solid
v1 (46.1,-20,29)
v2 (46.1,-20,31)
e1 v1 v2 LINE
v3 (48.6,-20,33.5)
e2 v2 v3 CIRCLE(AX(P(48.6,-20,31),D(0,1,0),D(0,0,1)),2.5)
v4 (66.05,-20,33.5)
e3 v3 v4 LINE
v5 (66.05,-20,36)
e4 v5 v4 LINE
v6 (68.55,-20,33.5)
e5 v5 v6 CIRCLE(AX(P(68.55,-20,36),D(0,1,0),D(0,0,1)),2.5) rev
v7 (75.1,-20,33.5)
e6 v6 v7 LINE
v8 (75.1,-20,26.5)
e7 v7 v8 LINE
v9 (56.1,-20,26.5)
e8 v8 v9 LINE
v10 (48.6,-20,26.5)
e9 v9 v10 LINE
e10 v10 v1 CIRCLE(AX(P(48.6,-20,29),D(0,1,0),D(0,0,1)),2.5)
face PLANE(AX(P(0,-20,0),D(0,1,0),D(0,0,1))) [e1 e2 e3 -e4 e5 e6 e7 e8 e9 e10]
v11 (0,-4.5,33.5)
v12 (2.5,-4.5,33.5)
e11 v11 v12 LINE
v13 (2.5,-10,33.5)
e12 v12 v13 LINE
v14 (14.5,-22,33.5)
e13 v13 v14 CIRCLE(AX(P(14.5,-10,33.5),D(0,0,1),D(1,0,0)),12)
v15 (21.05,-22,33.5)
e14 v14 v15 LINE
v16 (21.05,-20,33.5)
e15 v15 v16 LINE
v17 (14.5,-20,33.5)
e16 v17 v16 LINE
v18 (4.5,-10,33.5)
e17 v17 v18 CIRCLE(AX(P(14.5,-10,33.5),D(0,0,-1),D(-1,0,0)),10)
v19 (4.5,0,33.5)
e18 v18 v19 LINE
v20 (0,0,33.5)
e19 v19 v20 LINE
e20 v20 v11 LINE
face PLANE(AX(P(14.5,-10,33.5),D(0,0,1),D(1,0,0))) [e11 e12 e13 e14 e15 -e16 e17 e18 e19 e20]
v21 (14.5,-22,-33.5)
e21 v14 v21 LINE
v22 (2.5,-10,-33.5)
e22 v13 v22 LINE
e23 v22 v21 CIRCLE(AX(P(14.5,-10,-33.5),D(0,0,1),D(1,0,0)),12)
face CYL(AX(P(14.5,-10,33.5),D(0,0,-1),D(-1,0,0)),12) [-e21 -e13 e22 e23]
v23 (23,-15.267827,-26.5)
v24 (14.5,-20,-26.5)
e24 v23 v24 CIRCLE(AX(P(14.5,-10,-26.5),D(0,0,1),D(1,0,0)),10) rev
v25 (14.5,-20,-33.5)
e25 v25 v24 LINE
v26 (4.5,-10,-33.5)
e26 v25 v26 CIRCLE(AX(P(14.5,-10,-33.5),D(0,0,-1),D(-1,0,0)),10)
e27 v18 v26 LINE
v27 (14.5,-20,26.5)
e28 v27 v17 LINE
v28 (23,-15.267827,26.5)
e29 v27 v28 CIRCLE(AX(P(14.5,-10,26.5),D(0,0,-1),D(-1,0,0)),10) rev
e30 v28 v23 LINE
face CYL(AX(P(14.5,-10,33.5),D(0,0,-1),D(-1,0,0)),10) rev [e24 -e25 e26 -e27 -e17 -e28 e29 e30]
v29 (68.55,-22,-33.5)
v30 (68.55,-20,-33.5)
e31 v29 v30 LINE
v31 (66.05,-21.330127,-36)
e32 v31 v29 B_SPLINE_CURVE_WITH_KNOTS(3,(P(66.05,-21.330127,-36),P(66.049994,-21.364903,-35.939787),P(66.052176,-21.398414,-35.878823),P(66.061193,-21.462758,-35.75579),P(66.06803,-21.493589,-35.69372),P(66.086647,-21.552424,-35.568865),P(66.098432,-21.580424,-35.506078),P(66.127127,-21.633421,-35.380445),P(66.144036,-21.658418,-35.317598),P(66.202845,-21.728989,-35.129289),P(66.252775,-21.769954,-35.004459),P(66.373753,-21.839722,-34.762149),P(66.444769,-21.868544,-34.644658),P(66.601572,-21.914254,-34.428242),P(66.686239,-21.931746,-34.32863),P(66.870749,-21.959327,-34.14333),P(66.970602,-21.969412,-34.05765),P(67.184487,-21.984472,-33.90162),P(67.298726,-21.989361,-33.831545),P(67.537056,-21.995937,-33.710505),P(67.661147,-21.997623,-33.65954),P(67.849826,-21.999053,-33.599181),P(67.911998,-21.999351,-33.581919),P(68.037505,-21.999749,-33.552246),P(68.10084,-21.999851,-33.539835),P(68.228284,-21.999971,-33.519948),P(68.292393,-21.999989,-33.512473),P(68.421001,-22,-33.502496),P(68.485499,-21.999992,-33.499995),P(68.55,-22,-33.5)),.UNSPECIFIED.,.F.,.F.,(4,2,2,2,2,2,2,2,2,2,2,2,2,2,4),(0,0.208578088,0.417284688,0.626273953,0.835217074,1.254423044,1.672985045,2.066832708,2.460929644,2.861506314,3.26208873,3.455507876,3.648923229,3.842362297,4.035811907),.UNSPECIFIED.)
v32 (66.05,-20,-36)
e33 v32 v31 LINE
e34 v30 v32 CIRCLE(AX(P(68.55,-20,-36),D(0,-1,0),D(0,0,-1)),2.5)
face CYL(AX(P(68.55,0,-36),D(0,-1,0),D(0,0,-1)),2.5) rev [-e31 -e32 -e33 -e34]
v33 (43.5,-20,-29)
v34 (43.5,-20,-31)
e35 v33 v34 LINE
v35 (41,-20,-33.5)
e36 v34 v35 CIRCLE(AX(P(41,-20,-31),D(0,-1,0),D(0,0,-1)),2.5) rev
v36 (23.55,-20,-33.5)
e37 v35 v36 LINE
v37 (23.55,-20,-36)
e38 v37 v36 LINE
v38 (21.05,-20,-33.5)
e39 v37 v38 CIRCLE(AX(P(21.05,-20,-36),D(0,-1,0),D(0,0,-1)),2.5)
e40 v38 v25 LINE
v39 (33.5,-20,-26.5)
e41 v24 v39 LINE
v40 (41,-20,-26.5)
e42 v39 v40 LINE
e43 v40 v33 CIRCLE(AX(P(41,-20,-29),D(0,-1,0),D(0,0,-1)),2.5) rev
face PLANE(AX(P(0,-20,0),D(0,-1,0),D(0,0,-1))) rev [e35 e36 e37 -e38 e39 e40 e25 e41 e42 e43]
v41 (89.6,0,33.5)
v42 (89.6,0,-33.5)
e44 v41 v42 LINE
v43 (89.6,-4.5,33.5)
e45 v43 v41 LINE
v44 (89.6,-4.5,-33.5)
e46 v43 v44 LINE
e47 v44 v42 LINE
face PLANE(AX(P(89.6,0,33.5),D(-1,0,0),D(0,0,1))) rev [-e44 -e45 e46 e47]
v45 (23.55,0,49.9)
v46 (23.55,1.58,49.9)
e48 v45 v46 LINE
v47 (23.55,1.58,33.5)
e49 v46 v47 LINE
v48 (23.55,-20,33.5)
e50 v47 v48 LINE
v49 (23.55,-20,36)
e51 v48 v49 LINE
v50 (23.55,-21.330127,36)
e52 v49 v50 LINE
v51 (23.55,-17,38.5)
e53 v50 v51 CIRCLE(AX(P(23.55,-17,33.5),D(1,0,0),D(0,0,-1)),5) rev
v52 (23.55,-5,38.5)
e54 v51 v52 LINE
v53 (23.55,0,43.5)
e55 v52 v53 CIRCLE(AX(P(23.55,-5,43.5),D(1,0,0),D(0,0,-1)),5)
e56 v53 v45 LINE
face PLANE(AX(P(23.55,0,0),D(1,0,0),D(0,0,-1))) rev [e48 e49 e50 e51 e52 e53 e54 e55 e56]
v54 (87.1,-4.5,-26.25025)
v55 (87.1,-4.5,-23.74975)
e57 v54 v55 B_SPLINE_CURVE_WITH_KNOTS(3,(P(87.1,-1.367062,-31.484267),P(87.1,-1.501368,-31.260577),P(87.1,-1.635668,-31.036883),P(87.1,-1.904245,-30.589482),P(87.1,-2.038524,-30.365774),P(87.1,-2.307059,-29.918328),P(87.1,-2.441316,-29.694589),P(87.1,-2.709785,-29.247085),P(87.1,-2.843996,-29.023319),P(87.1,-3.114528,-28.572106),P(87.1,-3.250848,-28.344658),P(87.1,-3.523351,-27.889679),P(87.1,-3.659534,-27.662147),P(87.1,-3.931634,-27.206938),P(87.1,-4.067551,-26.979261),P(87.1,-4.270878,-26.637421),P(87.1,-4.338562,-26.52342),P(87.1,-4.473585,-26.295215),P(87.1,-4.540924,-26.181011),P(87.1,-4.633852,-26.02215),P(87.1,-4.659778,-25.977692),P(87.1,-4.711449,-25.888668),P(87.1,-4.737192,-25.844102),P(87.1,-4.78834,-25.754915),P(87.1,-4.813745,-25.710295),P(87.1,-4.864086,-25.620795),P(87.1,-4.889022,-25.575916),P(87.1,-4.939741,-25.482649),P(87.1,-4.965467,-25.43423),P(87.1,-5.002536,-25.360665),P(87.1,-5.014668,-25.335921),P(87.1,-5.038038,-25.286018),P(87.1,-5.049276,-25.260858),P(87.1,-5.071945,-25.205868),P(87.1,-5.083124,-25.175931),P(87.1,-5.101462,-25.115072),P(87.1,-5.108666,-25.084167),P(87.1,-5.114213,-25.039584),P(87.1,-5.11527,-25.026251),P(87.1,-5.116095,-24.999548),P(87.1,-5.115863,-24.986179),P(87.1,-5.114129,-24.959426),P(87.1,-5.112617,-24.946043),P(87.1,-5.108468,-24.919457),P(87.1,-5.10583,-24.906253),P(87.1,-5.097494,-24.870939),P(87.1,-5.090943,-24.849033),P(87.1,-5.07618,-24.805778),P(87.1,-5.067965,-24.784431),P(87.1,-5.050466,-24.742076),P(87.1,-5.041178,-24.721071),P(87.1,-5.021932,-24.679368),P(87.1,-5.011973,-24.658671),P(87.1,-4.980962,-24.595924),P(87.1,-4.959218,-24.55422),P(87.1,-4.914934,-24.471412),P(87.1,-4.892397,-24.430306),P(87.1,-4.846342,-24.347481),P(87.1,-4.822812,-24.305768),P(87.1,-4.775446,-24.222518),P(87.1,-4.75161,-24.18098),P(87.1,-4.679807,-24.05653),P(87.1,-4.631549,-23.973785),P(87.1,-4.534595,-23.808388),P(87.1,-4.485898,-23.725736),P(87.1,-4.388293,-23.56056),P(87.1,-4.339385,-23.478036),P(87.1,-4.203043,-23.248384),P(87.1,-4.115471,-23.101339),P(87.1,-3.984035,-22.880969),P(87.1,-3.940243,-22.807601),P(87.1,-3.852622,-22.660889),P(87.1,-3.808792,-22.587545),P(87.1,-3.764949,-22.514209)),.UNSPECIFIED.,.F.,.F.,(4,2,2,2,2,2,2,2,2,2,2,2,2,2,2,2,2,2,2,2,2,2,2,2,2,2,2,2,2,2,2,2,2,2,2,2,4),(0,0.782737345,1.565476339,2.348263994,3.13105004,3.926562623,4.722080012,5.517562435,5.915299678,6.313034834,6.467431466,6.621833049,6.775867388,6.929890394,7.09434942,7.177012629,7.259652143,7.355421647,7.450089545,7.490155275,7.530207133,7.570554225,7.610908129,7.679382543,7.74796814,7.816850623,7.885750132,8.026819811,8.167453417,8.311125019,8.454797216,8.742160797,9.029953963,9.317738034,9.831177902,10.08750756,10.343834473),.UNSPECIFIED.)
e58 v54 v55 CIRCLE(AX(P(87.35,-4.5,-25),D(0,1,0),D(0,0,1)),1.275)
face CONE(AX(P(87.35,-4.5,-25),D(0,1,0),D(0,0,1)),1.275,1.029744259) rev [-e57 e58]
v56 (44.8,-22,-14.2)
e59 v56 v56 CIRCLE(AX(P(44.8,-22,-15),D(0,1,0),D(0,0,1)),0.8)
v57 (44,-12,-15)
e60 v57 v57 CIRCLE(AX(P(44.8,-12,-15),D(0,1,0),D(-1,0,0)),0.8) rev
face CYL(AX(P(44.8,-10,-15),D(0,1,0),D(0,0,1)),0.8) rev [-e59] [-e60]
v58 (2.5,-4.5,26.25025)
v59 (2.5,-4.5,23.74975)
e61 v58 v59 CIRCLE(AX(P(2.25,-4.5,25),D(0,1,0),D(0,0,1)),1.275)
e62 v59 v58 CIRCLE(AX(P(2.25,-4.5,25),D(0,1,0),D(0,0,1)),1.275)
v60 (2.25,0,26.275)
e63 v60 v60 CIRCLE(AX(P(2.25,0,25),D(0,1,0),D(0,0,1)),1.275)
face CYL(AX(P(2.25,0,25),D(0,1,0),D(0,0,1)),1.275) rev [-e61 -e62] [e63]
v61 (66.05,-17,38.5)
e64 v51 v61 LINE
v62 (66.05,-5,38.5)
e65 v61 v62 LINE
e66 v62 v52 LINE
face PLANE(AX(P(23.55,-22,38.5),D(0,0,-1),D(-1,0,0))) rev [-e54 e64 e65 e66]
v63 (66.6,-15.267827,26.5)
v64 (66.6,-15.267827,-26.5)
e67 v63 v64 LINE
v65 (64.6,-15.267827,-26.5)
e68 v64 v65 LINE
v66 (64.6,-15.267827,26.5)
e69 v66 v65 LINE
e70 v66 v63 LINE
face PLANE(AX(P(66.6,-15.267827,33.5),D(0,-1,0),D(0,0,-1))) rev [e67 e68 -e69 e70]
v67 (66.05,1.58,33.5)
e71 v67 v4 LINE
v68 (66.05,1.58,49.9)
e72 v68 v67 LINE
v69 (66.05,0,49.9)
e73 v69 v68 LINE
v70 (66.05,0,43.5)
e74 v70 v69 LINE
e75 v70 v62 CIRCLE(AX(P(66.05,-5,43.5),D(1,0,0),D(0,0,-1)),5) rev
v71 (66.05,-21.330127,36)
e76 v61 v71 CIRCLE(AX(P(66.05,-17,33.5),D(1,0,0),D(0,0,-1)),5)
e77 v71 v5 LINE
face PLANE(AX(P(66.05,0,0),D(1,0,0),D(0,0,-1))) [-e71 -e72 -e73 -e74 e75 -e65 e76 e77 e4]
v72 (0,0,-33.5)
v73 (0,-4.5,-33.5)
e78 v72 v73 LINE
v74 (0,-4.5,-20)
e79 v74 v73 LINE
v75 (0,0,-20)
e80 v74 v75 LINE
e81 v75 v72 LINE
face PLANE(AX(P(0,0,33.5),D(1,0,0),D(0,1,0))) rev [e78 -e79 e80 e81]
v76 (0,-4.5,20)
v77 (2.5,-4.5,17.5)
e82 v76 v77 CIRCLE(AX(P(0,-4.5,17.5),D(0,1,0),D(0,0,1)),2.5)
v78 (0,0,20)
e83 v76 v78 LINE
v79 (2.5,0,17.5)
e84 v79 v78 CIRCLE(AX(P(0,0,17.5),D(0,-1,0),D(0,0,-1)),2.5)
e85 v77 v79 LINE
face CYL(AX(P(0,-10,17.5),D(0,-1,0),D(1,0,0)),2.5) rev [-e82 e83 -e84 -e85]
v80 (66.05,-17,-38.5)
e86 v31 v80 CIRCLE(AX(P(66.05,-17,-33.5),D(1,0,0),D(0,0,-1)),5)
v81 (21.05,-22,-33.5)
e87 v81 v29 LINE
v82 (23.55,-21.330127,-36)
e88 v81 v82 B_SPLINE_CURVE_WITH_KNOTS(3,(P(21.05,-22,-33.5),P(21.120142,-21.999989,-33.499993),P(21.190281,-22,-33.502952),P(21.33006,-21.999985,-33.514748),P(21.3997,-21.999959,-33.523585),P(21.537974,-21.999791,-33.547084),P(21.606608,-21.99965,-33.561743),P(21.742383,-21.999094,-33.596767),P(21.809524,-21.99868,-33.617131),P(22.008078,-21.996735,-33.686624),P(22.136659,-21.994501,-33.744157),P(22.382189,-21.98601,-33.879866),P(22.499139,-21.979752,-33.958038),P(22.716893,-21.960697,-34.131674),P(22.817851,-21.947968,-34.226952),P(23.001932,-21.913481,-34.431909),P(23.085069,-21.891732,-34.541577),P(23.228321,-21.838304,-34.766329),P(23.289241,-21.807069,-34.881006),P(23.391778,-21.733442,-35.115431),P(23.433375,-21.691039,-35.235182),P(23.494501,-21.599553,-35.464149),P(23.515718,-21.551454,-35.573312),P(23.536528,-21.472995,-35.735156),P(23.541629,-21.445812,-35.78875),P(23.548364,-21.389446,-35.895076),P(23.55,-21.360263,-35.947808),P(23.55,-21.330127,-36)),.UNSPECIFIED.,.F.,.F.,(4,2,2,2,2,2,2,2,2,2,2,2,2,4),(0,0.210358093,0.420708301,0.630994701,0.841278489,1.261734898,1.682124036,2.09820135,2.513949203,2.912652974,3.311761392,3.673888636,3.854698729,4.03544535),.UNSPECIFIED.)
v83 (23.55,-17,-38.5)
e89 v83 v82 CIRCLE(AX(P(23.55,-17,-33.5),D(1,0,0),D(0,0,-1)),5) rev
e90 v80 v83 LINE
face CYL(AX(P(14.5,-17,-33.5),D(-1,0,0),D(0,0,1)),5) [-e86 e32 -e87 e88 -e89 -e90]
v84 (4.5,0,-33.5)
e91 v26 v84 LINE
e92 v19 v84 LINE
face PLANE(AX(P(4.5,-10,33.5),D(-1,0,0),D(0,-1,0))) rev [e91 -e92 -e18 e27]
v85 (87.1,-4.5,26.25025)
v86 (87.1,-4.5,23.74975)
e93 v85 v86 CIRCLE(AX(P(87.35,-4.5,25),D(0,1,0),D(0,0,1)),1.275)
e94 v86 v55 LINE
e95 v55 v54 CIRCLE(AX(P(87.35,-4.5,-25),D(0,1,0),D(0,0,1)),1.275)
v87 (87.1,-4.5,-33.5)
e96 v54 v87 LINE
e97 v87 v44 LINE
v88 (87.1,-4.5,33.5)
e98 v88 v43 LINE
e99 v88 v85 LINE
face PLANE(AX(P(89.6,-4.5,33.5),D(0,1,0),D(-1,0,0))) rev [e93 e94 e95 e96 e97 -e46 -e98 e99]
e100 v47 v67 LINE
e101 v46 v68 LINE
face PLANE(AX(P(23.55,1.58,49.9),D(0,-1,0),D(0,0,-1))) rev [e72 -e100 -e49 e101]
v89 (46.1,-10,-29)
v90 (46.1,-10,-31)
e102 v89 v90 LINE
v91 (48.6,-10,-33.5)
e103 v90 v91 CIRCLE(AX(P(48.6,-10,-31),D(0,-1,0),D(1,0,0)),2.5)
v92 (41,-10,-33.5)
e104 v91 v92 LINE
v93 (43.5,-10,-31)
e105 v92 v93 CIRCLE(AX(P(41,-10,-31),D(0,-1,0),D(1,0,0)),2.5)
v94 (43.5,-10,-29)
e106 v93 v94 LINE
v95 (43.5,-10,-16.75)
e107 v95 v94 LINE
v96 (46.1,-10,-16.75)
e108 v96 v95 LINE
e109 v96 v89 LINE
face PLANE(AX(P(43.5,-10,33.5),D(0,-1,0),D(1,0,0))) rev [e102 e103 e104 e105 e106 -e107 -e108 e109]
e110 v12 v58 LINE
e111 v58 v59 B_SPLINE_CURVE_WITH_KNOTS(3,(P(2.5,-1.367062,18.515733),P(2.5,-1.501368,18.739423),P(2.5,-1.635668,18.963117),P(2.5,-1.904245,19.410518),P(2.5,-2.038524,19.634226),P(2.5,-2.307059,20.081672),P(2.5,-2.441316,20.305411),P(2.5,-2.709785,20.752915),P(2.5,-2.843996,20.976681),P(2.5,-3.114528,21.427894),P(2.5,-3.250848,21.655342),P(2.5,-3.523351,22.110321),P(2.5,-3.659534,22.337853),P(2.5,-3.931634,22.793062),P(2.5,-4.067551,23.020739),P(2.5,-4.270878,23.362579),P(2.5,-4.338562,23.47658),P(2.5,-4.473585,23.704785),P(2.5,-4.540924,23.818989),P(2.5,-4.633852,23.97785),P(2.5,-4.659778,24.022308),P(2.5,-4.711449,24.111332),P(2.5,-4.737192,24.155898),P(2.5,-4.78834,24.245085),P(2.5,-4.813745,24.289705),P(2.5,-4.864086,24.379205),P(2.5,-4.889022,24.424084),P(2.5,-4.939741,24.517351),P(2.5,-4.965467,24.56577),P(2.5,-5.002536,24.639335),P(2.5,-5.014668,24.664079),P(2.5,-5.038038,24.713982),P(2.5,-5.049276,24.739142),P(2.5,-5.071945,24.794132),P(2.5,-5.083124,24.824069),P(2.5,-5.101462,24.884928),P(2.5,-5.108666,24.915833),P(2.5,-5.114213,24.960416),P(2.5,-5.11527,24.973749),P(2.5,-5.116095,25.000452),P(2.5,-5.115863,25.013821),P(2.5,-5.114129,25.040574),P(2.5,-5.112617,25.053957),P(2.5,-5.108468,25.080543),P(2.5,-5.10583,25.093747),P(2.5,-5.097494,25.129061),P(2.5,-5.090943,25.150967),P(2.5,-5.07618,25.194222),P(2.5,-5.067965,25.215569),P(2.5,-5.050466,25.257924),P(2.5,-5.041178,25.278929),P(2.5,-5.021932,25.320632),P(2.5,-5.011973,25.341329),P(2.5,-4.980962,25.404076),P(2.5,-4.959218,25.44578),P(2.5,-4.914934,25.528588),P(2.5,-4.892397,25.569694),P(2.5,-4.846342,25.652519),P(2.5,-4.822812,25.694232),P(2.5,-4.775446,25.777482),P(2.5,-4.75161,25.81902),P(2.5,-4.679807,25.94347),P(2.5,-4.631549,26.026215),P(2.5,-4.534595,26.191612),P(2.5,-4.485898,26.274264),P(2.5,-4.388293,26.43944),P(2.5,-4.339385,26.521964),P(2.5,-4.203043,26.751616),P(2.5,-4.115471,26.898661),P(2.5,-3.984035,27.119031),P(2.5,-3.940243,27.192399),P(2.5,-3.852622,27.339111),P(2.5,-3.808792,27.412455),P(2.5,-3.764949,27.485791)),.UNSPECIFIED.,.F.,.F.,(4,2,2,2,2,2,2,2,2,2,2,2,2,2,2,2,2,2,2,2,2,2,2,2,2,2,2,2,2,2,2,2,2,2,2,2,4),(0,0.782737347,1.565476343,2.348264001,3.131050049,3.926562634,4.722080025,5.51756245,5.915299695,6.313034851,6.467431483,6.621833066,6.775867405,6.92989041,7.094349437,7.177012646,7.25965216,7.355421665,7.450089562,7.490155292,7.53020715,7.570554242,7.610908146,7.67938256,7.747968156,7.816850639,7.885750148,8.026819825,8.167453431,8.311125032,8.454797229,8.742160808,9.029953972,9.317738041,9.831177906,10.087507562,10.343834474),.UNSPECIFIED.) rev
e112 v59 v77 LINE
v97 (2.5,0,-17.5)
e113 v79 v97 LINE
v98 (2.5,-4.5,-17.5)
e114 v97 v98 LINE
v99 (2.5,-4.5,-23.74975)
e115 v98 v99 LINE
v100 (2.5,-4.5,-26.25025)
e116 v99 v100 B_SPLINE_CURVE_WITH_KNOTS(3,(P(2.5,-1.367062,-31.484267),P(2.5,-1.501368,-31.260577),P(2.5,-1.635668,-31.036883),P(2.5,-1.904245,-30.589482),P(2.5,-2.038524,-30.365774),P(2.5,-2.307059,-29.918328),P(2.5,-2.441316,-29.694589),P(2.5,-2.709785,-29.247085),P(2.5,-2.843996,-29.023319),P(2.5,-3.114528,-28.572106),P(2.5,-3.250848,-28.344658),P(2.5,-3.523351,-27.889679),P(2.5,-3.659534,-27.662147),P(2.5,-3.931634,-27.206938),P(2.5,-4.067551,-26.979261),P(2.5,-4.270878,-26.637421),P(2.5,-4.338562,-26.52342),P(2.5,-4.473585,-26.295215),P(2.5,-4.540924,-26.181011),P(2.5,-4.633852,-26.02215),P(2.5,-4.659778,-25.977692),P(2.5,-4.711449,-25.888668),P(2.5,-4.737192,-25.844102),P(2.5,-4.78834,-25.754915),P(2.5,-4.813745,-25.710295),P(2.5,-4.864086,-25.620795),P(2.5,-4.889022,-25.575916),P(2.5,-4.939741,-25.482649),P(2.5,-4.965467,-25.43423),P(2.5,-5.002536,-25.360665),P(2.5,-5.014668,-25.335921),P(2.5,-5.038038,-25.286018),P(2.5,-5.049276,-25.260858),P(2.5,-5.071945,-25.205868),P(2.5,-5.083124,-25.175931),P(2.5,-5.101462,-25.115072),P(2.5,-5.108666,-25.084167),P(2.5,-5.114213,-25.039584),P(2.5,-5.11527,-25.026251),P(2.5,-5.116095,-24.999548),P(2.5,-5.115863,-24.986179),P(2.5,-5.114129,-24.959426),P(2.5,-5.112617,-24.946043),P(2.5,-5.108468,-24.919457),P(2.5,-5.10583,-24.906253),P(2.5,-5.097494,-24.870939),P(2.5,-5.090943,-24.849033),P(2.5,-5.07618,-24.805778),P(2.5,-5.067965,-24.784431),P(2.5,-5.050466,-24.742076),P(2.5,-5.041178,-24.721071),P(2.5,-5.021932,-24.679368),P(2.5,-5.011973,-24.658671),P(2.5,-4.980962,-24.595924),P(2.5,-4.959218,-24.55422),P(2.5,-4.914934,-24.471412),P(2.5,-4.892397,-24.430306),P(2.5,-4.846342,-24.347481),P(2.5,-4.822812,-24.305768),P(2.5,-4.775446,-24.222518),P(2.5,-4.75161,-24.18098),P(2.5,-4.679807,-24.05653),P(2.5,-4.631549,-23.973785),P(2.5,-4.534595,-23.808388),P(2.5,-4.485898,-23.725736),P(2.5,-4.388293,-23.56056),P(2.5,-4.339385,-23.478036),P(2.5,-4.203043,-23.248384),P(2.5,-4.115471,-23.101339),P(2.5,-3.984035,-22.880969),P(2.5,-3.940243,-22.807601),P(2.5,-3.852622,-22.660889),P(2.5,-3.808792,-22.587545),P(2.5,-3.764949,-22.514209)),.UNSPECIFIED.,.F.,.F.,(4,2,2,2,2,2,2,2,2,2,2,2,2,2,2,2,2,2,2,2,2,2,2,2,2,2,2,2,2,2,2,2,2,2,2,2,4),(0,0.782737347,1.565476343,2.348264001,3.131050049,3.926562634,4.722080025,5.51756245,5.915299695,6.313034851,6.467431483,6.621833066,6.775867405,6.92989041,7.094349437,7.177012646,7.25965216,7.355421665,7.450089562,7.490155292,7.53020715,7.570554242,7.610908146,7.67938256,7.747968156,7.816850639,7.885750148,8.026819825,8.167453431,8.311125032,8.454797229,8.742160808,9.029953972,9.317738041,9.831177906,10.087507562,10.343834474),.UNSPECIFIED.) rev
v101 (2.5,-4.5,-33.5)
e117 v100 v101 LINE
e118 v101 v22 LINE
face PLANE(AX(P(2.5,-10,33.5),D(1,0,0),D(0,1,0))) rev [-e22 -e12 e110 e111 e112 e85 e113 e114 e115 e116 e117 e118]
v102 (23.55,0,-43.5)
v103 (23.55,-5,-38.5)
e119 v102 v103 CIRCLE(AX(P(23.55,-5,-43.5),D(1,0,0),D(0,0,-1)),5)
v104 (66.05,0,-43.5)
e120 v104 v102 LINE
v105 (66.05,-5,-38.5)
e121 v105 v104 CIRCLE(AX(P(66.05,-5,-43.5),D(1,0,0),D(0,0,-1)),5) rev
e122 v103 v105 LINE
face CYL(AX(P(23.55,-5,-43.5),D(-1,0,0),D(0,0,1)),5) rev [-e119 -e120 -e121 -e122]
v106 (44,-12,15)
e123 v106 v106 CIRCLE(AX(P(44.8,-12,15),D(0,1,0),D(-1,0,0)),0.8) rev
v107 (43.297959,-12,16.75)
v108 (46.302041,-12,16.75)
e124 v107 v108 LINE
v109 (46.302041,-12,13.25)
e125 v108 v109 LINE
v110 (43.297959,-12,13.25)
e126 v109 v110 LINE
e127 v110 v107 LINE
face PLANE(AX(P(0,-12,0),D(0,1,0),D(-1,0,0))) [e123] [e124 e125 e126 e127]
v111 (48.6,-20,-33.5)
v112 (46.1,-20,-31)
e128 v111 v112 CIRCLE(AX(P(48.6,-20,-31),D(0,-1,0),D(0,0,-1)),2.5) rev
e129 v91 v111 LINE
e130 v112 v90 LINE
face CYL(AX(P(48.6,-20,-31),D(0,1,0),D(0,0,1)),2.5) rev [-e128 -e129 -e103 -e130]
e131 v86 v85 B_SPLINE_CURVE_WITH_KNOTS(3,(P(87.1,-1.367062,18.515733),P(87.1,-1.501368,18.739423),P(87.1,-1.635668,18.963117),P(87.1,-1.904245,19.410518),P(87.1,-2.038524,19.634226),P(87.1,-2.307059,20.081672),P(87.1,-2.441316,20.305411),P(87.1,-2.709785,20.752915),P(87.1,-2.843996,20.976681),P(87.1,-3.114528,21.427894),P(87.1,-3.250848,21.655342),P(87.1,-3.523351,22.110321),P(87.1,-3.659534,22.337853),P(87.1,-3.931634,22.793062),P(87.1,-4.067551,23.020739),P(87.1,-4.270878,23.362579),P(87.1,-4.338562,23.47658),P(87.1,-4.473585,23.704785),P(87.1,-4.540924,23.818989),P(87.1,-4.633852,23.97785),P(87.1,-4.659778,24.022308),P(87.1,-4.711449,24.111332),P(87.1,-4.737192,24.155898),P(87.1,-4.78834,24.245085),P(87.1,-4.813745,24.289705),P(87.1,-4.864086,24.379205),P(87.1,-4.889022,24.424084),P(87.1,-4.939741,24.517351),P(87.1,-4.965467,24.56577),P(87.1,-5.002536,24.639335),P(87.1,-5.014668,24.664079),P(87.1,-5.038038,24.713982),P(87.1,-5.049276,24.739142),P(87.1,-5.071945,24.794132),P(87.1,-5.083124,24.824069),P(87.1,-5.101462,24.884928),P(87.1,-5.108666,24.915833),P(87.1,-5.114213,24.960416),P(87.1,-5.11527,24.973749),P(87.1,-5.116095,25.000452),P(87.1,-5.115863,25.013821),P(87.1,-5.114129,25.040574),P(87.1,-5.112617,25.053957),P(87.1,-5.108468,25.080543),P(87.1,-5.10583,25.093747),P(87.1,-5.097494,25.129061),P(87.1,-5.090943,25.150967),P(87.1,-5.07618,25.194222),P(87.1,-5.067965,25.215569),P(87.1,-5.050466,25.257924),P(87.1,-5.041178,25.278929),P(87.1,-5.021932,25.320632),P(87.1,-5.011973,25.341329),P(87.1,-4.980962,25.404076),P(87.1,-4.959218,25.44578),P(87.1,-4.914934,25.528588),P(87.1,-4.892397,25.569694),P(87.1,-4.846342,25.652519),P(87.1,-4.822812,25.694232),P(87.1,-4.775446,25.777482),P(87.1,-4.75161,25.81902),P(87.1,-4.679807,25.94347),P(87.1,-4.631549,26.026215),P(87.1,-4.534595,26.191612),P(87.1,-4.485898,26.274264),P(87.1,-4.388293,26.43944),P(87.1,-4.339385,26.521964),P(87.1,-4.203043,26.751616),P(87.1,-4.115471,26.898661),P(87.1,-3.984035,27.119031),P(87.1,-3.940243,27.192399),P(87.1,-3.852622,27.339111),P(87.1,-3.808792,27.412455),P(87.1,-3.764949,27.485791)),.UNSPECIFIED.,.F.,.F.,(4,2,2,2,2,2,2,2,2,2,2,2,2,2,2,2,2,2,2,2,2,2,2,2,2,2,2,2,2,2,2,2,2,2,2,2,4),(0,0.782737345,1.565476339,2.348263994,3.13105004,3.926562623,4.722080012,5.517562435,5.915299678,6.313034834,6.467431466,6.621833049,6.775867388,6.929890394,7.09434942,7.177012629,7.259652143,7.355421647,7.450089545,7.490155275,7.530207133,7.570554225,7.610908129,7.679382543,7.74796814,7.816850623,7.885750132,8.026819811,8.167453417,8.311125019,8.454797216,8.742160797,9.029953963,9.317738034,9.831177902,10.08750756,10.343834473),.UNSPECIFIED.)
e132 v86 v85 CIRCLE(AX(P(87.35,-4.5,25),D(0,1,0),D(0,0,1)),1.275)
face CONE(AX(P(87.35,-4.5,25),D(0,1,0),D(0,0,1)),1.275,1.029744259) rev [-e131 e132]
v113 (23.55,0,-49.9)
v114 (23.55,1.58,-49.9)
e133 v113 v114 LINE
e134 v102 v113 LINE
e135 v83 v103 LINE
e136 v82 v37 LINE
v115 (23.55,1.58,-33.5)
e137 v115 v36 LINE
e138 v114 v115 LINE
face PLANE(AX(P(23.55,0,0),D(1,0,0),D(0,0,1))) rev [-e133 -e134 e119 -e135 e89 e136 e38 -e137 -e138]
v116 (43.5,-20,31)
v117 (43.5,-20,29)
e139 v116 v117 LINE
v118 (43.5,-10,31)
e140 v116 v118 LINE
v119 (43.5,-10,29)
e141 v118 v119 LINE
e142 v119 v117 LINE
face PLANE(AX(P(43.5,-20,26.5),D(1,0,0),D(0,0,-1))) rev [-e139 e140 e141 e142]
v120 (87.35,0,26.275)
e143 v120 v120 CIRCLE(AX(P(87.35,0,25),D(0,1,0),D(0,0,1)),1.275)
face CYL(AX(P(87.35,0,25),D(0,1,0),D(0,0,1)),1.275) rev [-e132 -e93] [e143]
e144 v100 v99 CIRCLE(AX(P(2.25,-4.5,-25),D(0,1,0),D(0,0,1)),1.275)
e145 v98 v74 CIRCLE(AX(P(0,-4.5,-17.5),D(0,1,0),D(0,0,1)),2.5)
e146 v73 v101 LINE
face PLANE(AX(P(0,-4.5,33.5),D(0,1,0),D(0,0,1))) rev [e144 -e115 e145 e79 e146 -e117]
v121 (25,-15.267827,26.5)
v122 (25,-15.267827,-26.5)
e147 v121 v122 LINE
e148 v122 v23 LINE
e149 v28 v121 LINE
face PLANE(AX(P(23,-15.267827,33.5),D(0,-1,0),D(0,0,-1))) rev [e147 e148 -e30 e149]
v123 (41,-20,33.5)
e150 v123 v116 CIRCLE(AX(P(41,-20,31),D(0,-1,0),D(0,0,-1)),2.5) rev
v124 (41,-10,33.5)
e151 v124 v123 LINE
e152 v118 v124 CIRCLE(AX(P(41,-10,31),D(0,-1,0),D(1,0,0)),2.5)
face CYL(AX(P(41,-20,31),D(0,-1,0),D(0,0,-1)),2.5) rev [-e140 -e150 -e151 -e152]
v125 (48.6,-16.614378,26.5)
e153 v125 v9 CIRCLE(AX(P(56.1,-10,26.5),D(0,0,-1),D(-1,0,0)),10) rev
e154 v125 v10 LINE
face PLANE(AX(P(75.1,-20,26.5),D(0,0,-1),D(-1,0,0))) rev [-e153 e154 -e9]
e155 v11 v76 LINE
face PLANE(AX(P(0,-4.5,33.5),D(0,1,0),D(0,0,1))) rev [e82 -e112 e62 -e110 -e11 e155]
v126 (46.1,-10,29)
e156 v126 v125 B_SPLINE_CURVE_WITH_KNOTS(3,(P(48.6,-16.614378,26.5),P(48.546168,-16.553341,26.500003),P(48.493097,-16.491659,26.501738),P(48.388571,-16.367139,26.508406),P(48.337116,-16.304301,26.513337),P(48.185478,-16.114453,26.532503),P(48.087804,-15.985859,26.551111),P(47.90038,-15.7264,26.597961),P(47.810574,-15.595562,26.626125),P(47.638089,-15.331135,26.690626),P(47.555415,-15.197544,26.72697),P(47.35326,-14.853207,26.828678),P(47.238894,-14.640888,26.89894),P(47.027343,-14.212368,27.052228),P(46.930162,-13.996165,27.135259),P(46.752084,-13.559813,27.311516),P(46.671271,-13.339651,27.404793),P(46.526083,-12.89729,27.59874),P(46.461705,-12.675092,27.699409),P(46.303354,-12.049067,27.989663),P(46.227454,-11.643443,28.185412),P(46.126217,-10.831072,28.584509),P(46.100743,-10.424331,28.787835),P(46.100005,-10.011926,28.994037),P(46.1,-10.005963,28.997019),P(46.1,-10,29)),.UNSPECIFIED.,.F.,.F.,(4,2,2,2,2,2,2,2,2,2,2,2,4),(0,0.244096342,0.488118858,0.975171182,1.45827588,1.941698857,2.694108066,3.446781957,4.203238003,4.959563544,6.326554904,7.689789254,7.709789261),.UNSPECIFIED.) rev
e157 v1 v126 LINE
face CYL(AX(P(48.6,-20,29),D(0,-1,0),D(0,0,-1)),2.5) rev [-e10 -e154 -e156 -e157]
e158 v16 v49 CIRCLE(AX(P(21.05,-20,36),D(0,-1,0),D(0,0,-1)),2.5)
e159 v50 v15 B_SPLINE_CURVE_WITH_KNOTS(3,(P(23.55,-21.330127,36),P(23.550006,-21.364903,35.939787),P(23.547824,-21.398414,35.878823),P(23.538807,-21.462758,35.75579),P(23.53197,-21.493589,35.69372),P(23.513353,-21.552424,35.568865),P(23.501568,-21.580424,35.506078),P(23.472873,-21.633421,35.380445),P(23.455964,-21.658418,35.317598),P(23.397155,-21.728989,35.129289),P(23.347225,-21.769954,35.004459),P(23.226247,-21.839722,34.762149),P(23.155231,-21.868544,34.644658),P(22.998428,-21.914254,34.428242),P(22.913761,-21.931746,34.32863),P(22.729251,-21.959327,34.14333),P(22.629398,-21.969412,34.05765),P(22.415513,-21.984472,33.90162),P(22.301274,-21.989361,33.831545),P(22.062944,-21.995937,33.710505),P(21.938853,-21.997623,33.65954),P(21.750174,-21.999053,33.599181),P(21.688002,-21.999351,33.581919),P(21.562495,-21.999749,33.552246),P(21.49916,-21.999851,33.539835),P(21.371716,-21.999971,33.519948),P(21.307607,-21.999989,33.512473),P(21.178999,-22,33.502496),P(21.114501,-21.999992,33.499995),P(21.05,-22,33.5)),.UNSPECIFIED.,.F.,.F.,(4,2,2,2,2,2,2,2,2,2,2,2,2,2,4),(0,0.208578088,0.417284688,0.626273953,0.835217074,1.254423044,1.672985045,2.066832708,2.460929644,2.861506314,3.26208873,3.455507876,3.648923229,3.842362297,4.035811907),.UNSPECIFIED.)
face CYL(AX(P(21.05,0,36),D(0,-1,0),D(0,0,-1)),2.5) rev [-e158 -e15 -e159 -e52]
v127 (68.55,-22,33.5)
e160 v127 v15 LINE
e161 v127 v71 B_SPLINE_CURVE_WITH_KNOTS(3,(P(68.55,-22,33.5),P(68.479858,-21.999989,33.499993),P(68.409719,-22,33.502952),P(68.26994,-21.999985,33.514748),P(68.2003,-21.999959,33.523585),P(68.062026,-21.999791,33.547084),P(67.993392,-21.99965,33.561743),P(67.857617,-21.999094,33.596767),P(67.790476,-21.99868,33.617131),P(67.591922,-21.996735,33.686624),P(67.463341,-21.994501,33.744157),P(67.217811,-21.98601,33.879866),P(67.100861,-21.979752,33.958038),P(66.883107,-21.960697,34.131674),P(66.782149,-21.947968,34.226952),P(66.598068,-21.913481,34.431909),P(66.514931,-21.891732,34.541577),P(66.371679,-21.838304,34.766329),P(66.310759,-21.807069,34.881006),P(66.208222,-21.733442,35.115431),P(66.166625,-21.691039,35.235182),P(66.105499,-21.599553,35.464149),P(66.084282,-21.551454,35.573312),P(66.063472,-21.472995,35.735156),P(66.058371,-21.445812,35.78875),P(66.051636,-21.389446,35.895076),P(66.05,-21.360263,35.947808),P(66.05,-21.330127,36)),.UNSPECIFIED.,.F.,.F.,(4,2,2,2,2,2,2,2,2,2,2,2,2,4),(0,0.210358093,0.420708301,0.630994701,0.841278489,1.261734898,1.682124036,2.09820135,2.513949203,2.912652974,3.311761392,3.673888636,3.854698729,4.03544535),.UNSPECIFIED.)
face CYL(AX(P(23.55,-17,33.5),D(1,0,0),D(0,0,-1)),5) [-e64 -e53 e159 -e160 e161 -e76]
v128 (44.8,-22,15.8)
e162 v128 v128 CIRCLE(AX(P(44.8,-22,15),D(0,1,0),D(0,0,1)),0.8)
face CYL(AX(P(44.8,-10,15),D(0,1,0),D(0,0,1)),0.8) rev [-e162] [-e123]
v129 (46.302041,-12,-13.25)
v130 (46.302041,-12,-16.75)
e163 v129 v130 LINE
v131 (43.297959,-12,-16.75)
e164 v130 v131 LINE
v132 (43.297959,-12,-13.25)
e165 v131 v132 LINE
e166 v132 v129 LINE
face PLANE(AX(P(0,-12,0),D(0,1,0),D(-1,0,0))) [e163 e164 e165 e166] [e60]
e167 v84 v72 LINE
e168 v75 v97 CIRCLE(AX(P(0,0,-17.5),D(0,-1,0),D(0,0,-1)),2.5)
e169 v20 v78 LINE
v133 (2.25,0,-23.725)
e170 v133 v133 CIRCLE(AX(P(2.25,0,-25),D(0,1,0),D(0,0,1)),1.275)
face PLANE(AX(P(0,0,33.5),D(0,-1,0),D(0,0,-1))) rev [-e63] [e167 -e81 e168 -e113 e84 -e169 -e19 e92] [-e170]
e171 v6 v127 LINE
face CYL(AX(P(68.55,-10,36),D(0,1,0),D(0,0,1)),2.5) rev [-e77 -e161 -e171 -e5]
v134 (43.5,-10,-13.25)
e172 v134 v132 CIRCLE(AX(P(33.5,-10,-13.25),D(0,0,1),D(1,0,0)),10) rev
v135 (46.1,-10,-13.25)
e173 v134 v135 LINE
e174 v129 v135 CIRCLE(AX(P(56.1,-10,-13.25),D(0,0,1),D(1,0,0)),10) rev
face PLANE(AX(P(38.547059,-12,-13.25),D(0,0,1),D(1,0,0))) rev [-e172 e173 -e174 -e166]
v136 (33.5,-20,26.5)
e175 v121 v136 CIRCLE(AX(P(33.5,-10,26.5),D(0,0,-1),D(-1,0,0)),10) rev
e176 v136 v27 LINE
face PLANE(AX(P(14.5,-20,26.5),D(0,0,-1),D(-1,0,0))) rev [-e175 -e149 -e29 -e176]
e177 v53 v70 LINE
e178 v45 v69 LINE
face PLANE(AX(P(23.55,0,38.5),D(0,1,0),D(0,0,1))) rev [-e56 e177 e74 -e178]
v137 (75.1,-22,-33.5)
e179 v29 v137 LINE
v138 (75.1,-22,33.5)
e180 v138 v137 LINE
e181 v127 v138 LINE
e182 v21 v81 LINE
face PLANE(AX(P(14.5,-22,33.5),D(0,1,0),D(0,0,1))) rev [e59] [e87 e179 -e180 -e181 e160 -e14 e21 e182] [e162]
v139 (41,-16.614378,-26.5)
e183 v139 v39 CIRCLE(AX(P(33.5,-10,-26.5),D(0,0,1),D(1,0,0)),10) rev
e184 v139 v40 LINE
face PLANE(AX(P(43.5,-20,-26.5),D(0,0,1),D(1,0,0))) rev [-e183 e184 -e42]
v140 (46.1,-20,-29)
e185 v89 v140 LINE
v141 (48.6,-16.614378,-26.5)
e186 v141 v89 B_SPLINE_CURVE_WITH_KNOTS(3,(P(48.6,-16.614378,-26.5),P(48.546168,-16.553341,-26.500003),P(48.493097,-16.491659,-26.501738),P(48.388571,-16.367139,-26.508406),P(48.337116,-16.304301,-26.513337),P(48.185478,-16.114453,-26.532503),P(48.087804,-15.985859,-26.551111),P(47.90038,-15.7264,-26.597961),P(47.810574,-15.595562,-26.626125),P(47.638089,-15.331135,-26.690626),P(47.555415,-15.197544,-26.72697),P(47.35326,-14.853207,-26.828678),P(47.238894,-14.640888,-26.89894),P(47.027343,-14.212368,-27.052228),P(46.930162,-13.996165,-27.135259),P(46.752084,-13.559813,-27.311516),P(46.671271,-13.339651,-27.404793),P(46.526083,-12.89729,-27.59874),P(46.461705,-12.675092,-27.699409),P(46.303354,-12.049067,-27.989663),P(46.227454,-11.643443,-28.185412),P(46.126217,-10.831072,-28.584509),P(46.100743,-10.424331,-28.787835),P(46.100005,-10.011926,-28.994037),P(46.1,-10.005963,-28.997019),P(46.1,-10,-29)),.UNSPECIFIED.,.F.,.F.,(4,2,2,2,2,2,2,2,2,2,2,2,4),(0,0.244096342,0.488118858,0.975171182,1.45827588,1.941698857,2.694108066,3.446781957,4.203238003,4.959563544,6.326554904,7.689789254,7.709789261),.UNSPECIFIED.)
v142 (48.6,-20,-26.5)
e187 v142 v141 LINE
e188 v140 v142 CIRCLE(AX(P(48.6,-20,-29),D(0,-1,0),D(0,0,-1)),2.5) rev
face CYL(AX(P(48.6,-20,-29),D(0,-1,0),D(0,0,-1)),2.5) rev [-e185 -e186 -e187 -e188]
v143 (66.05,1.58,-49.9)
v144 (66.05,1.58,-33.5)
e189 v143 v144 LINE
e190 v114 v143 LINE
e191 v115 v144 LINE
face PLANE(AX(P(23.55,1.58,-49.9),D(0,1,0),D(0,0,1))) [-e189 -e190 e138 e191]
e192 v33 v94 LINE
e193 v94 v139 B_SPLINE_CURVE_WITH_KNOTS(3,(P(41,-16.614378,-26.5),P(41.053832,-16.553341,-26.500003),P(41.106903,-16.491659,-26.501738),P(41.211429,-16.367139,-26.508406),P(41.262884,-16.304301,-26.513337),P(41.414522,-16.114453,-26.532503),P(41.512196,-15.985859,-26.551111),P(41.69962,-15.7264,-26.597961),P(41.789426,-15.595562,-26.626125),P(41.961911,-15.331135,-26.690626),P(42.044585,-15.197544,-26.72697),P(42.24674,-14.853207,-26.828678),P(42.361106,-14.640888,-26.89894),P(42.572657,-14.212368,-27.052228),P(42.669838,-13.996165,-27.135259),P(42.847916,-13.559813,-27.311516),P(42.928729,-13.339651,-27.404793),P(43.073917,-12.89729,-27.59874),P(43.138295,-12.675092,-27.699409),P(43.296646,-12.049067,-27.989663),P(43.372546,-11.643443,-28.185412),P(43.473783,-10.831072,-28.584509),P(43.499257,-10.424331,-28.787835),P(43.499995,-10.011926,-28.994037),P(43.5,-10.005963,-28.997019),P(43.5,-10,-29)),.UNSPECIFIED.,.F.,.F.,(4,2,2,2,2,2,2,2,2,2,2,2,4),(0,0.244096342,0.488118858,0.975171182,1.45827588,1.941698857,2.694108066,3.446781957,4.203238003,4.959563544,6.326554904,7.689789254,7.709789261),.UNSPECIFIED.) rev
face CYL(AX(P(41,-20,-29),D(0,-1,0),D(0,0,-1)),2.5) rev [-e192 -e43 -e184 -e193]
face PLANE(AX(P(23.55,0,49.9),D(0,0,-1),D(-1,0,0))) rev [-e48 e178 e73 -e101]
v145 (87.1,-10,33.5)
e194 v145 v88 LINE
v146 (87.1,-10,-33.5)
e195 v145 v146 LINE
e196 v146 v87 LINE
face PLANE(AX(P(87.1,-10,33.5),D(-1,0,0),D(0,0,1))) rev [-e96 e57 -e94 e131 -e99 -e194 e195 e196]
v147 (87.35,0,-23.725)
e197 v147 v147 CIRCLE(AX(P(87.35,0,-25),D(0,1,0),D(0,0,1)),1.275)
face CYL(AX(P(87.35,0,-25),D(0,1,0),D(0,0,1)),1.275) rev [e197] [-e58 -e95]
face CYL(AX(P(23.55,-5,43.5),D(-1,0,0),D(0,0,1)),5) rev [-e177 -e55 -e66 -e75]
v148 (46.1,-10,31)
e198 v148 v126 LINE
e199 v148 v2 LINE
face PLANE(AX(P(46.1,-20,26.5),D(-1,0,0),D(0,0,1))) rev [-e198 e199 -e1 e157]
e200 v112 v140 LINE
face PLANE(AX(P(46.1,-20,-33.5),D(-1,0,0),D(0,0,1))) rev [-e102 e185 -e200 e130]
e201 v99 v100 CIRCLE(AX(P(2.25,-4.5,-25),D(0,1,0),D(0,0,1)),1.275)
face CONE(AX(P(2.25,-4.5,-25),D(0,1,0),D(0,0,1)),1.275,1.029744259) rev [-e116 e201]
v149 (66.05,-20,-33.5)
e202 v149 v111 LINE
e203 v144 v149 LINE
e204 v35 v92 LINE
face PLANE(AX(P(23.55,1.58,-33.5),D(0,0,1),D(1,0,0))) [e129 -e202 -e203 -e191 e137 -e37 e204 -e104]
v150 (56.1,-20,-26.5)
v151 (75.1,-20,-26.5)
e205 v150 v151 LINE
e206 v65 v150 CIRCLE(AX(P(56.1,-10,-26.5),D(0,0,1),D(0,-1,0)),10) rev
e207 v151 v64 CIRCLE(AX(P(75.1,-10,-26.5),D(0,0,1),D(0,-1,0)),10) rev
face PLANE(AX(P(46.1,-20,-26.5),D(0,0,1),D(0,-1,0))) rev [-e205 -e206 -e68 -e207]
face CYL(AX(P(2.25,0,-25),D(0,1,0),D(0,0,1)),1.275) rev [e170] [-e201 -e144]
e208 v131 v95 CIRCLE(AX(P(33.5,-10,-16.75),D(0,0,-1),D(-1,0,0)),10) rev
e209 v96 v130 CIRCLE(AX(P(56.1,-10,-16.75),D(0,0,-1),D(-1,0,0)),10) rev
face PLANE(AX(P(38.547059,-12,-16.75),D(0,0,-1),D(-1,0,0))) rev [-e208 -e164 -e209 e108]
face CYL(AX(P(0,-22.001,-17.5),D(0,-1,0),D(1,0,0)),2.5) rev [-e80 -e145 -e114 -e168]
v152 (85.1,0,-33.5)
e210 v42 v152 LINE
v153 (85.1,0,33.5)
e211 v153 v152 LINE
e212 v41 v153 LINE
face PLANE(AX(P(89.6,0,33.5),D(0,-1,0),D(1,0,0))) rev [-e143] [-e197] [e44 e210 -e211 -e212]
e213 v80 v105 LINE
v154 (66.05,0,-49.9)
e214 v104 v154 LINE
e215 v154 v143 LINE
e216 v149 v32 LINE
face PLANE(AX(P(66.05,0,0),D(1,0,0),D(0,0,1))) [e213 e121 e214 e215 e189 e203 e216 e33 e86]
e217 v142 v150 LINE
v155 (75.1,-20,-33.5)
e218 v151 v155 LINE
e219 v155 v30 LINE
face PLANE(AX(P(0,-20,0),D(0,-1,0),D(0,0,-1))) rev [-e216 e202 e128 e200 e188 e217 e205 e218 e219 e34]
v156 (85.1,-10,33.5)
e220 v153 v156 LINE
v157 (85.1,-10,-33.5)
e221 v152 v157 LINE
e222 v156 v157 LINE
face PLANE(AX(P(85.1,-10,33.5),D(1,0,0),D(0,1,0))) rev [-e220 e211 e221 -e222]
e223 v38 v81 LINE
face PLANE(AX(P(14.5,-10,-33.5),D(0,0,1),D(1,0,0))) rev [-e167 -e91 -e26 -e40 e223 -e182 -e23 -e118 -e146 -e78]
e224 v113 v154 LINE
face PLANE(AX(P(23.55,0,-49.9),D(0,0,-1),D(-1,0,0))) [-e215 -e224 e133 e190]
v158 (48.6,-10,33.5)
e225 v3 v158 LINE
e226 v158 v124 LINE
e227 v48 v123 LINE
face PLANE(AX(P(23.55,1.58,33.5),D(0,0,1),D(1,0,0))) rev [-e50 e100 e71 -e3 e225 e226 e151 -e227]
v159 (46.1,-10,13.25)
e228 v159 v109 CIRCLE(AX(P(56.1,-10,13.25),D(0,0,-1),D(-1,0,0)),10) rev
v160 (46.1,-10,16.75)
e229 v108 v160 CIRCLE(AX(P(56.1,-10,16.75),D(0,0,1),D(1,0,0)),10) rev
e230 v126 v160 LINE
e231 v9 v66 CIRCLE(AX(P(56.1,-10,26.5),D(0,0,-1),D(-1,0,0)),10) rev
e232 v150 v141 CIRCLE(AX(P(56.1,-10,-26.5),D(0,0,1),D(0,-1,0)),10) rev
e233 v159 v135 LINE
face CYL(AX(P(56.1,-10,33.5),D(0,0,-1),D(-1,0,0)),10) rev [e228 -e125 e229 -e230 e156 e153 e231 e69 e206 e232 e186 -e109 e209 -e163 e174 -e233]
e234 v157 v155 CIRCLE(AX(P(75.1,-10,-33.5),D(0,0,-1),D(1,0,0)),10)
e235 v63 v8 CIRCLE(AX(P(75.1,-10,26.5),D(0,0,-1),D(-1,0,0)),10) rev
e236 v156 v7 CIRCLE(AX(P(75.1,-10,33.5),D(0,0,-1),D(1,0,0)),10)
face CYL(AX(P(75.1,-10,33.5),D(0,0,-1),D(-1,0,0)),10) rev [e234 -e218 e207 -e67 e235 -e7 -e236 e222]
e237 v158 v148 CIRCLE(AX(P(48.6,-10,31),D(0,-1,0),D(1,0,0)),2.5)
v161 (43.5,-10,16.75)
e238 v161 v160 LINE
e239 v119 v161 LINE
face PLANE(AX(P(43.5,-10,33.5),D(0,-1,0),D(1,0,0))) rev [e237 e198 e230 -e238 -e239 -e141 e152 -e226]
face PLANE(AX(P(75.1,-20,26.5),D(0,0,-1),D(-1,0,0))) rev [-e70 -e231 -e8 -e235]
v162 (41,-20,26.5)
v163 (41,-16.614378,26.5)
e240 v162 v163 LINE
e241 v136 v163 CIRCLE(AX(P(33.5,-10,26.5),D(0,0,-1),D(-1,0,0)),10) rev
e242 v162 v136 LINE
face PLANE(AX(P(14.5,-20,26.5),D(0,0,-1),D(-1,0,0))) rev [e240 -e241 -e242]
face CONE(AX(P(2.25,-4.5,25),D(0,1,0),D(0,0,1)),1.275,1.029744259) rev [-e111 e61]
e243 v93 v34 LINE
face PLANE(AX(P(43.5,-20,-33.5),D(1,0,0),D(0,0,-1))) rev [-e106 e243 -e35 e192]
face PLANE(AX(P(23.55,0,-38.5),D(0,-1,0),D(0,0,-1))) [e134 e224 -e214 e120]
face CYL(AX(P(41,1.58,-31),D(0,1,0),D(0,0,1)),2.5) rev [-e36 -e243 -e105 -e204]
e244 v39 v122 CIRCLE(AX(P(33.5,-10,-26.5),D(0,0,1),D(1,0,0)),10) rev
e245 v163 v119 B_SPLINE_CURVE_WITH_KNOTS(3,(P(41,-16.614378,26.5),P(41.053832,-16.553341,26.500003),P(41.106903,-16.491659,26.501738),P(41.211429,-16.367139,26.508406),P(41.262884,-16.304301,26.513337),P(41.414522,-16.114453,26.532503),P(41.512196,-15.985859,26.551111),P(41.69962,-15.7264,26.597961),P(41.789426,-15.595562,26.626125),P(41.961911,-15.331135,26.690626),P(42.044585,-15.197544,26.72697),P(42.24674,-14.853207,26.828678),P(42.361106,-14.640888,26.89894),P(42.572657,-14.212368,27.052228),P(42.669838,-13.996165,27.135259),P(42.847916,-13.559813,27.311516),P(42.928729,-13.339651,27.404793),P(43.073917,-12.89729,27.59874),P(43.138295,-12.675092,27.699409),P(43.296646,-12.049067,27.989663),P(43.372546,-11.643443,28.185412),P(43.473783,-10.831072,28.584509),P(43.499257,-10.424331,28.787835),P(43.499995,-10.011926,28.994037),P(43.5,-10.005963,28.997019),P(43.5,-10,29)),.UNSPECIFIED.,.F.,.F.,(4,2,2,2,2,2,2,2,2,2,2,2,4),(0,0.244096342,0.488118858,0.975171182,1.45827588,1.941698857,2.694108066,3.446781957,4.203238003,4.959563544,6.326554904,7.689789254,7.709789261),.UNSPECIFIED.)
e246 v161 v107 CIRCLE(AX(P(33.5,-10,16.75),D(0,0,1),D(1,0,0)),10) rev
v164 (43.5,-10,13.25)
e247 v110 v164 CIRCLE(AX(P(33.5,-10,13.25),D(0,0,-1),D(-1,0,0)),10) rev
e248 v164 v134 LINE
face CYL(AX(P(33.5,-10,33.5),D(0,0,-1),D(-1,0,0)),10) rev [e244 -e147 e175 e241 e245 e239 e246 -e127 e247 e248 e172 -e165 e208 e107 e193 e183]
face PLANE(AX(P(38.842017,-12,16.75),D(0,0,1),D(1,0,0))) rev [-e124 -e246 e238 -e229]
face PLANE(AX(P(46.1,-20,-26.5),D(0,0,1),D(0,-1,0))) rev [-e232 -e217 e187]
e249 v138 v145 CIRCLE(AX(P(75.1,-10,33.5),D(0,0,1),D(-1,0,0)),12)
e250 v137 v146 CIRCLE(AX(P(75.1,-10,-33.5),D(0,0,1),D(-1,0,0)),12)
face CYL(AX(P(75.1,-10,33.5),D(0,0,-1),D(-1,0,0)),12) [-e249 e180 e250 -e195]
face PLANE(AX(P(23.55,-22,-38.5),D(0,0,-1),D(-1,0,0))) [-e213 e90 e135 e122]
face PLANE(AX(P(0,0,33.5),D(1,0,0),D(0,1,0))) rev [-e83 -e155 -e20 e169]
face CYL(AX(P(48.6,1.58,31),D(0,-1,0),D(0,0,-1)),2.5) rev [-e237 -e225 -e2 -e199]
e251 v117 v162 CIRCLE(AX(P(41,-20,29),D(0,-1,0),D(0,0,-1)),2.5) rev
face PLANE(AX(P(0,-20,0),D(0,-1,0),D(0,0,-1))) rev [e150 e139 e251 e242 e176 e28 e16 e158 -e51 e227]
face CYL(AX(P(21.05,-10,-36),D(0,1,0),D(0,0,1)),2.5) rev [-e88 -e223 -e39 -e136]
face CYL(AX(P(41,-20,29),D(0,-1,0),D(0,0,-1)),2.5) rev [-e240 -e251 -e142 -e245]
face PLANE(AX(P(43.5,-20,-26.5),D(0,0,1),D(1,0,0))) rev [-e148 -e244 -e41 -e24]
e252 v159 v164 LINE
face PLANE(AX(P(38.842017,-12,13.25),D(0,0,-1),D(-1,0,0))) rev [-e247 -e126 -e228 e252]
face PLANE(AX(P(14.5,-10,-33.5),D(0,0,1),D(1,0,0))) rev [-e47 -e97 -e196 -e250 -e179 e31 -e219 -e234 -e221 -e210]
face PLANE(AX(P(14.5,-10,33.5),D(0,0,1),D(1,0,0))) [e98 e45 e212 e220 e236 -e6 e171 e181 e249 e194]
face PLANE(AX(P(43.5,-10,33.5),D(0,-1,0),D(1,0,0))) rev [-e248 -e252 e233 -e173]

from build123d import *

# Parameters (mm, degrees)
BOSS_EXTRUDE1_DEPTH                       = 33.5
BOSS_EXTRUDE2_DEPTH                       = 21.25
FILLET3_R                                 = 5
CUT_EXTRUDE3_REACH                        = 106.891
SKETCH14_W                                = 2.5
SKETCH14_H                                = 40
M2X0_4_TAPPED_HOLE1_D                     = 1.6
TAPPED_HOLE_FOR_M2_5X0_45_HELICOIL1_D     = 2.55
TAPPED_HOLE_FOR_M2_5X0_45_HELICOIL1_DEPTH = 4.5
TAPPED_HOLE_FOR_M2_5X0_45_HELICOIL1_TIP   = 0.766097289
SKETCH22_W                                = 29
SKETCH22_H                                = 7
CUT_EXTRUDE4_DEPTH                        = 21.58
FILLET5_R                                 = 2.5
SKETCH23_W                                = 12.652347045
SKETCH23_H                                = 3.5
SKETCH23_W_2                              = 11.018435539
CUT_EXTRUDE5_DEPTH                        = 2


with BuildPart() as part:
    # Sketch1 → Boss-Extrude1 (new, symmetric)
    with BuildSketch(Plane.XY):
        with BuildLine():
            Line((0, 0), (4.5, 0))
            Line((4.5, 0), (4.5, -10))
            ThreePointArc((4.5, -10), (11.761387212, -19.617692031), (23, -15.267826876))
            Line((23, -15.267826876), (25, -15.267826876))
            ThreePointArc((25, -15.267826876), (36.238612788, -19.617692031), (43.5, -10))
            Line((43.5, -10), (46.1, -10))
            ThreePointArc((46.1, -10), (53.361387212, -19.617692031), (64.6, -15.267826876))
            Line((64.6, -15.267826876), (66.6, -15.267826876))
            ThreePointArc((66.6, -15.267826876), (77.838612788, -19.617692031), (85.1, -10))
            Line((85.1, -10), (85.1, 0))
            Line((85.1, 0), (89.6, 0))
            Line((89.6, 0), (89.6, -4.5))
            Line((89.6, -4.5), (87.1, -4.5))
            Line((87.1, -4.5), (87.1, -10))
            ThreePointArc((87.1, -10), (83.585281374, -18.485281374), (75.1, -22))
            Line((75.1, -22), (14.5, -22))
            ThreePointArc((14.5, -22), (6.014718626, -18.485281374), (2.5, -10))
            Line((2.5, -10), (2.5, -4.5))
            Line((2.5, -4.5), (0, -4.5))
            Line((0, -4.5), (0, 0))
        make_face()
    extrude(amount=BOSS_EXTRUDE1_DEPTH, both=True)

    # Sketch9 → Boss-Extrude2 (add, symmetric)
    with BuildSketch(Plane.ZY.offset(-44.8)):
        Polygon((33.5, -22), (38.5, -22), (38.5, 0), (49.9, 0), (49.9, 1.58), (33.5, 1.58), align=None)
    boss_extrude2 = extrude(amount=BOSS_EXTRUDE2_DEPTH, both=True)

    # Mirror1: Boss-Extrude2 across plane
    add(boss_extrude2.mirror(Plane.XY))

    # Fillet3
    fillet3_edges = [part.edges().sort_by_distance(p)[0] for p in [
        (44.8, -22, -38.5),
        (44.8, 0, -38.5),
        (44.8, 0, 38.5),
        (44.8, -22, 38.5),
    ]]
    fillet(fillet3_edges, radius=FILLET3_R)

    # Sketch14 → Cut-Extrude3 (cut, up to next)
    with BuildSketch(Plane(origin=(0, 0, 0), x_dir=(1, 0, 0), z_dir=(0, 1, 0)), mode=Mode.PRIVATE) as cut_extrude3_sk1:
        with Locations((1.25, 0)):
            Rectangle(SKETCH14_W, SKETCH14_H)
    cut_extrude3_tool1 = extrude(cut_extrude3_sk1.sketch, amount=-CUT_EXTRUDE3_REACH, mode=Mode.PRIVATE) & part.part
    add(cut_extrude3_tool1.solids().sort_by_distance((1.25, 0, 0))[0], mode=Mode.SUBTRACT)

    # M2x0.4 Tapped Hole1 (through all)
    with Locations(Plane(origin=(0, -10, 0), x_dir=(1, 0, 0), z_dir=(0, 1, 0))):
        with Locations((44.8, 15), (44.8, -15)):
            Hole(M2X0_4_TAPPED_HOLE1_D / 2)

    # Tapped Hole for M2.5x0.45 Helicoil1
    with Locations(Plane(origin=(0, 0, 0), x_dir=(1, 0, 0), z_dir=(0, 1, 0))):
        with Locations((2.25, 25), (2.25, -25), (87.35, -25), (87.35, 25)):
            Hole(TAPPED_HOLE_FOR_M2_5X0_45_HELICOIL1_D / 2, depth=TAPPED_HOLE_FOR_M2_5X0_45_HELICOIL1_DEPTH)
            with Locations((0, 0, -(TAPPED_HOLE_FOR_M2_5X0_45_HELICOIL1_DEPTH + TAPPED_HOLE_FOR_M2_5X0_45_HELICOIL1_TIP / 2))):  # 118° drill point
                Cone(0, TAPPED_HOLE_FOR_M2_5X0_45_HELICOIL1_D / 2, TAPPED_HOLE_FOR_M2_5X0_45_HELICOIL1_TIP, mode=Mode.SUBTRACT)

    # Sketch22 → Cut-Extrude4 (cut)
    with BuildSketch(Plane(origin=(0, 1.58, 0), x_dir=(1, 0, 0), z_dir=(0, 1, 0))):
        with Locations((29, 30)):
            Rectangle(SKETCH22_W, SKETCH22_H)
        with Locations((60.6, 30)):
            Rectangle(SKETCH22_W, SKETCH22_H)
        with Locations((29, -30)):
            Rectangle(SKETCH22_W, SKETCH22_H)
        with Locations((60.6, -30)):
            Rectangle(SKETCH22_W, SKETCH22_H)
    extrude(amount=-CUT_EXTRUDE4_DEPTH, mode=Mode.SUBTRACT)

    # Fillet5
    # the kernel refuses this fillet: 2.5 mm, written as the material it adds along each edge
    with BuildSketch(Plane(origin=(23.55, -20, -33.5), x_dir=(0, 0, -1), z_dir=(0, -1, 0))) as fillet5_piece_1_section:
        with BuildLine():
            CenterArc((FILLET5_R, -FILLET5_R), FILLET5_R, 90, 90)
            Line((0, -FILLET5_R), (0, 0))
            Line((0, 0), (FILLET5_R, 0))
        make_face()
    fillet5_piece_1 = extrude(amount=8.25, mode=Mode.PRIVATE)
    fillet5_piece_1 = fillet5_piece_1 & Plane(origin=(22.982039754, -17, -33.5), x_dir=(0, -1, 0), z_dir=(-1, 0, 0)) * Cylinder(5, 27, mode=Mode.PRIVATE)
    add(fillet5_piece_1)
    with BuildSketch(Plane(origin=(66.05, -20, -33.5), x_dir=(0, 0, -1), z_dir=(0, -1, 0))) as fillet5_piece_2_section:
        with BuildLine():
            CenterArc((FILLET5_R, FILLET5_R), FILLET5_R, 180, 90)
            Line((0, FILLET5_R), (0, 0))
            Line((0, 0), (FILLET5_R, 0))
        make_face()
    fillet5_piece_2 = extrude(amount=8.25, mode=Mode.PRIVATE)
    fillet5_piece_2 = fillet5_piece_2 & Plane(origin=(66.617960246, -17, -33.5), x_dir=(0, -1, 0), z_dir=(-1, 0, 0)) * Cylinder(5, 27, mode=Mode.PRIVATE)
    add(fillet5_piece_2)
    with BuildSketch(Plane(origin=(66.05, -20, 33.5), x_dir=(0, 0, 1), z_dir=(0, -1, 0))) as fillet5_piece_3_section:
        with BuildLine():
            CenterArc((FILLET5_R, -FILLET5_R), FILLET5_R, 90, 90)
            Line((0, -FILLET5_R), (0, 0))
            Line((0, 0), (FILLET5_R, 0))
        make_face()
    fillet5_piece_3 = extrude(amount=8.25, mode=Mode.PRIVATE)
    fillet5_piece_3 = fillet5_piece_3 & Plane(origin=(66.617960246, -17, 33.5), x_dir=(0, -1, 0), z_dir=(-1, 0, 0)) * Cylinder(5, 27, mode=Mode.PRIVATE)
    add(fillet5_piece_3)
    with BuildSketch(Plane(origin=(23.55, -20, 33.5), x_dir=(0, 0, 1), z_dir=(0, -1, 0))) as fillet5_piece_4_section:
        with BuildLine():
            CenterArc((FILLET5_R, FILLET5_R), FILLET5_R, 180, 90)
            Line((0, FILLET5_R), (0, 0))
            Line((0, 0), (FILLET5_R, 0))
        make_face()
    fillet5_piece_4 = extrude(amount=8.25, mode=Mode.PRIVATE)
    fillet5_piece_4 = fillet5_piece_4 & Plane(origin=(22.982039754, -17, 33.5), x_dir=(0, -1, 0), z_dir=(-1, 0, 0)) * Cylinder(5, 27, mode=Mode.PRIVATE)
    add(fillet5_piece_4)
    with BuildSketch(Plane(origin=(2.5, 0, 20), x_dir=(-1, 0, 0), z_dir=(0, -1, 0)), Plane(origin=(2.5, 0, -20), x_dir=(0, 0, 1), z_dir=(0, -1, 0))) as fillet5_piece_5:
        with BuildLine():
            CenterArc((FILLET5_R, FILLET5_R), FILLET5_R, 180, 90)
            Line((0, FILLET5_R), (0, 0))
            Line((0, 0), (FILLET5_R, 0))
        make_face()
    extrude(amount=4.5)
    with BuildSketch(Plane(origin=(43.5, -10, -26.5), x_dir=(-1, 0, 0), z_dir=(0, -1, 0))) as fillet5_piece_6_section:
        with BuildLine():
            CenterArc((FILLET5_R, FILLET5_R), FILLET5_R, 180, 90)
            Line((0, FILLET5_R), (0, 0))
            Line((0, 0), (FILLET5_R, 0))
        make_face()
    fillet5_piece_6 = extrude(amount=10, mode=Mode.PRIVATE)
    fillet5_piece_6 = fillet5_piece_6 - Plane(origin=(33.5, -10, -27.115850249), x_dir=(-0.8499999999999996, -0.5267826876426376, 0), z_dir=(0, 0, 1)) * Cylinder(10, 30, mode=Mode.PRIVATE)
    add(fillet5_piece_6)
    with BuildSketch(Plane(origin=(43.5, -10, -33.5), x_dir=(0, 0, 1), z_dir=(0, -1, 0)), Plane(origin=(43.5, -10, 33.5), x_dir=(-1, 0, 0), z_dir=(0, -1, 0))) as fillet5_piece_7:
        with BuildLine():
            CenterArc((FILLET5_R, FILLET5_R), FILLET5_R, 180, 90)
            Line((0, FILLET5_R), (0, 0))
            Line((0, 0), (FILLET5_R, 0))
        make_face()
    extrude(amount=10)
    with BuildSketch(Plane(origin=(43.5, -10, 26.5), x_dir=(-1, 0, 0), z_dir=(0, -1, 0))) as fillet5_piece_8_section:
        with BuildLine():
            CenterArc((FILLET5_R, -FILLET5_R), FILLET5_R, 90, 90)
            Line((0, -FILLET5_R), (0, 0))
            Line((0, 0), (FILLET5_R, 0))
        make_face()
    fillet5_piece_8 = extrude(amount=10, mode=Mode.PRIVATE)
    fillet5_piece_8 = fillet5_piece_8 - Plane(origin=(33.5, -10, 27.115850249), x_dir=(-0.8499999999999996, -0.5267826876426376, 0), z_dir=(0, 0, 1)) * Cylinder(10, 30, mode=Mode.PRIVATE)
    add(fillet5_piece_8)
    with BuildSketch(Plane(origin=(46.1, -10, 33.5), x_dir=(1, 0, 0), z_dir=(0, -1, 0)), Plane(origin=(46.1, -10, -33.5), x_dir=(0, 0, 1), z_dir=(0, -1, 0))) as fillet5_piece_9:
        with BuildLine():
            CenterArc((FILLET5_R, -FILLET5_R), FILLET5_R, 90, 90)
            Line((0, -FILLET5_R), (0, 0))
            Line((0, 0), (FILLET5_R, 0))
        make_face()
    extrude(amount=10)
    with BuildSketch(Plane(origin=(46.1, -10, 26.5), x_dir=(1, 0, 0), z_dir=(0, -1, 0))) as fillet5_piece_10_section:
        with BuildLine():
            CenterArc((FILLET5_R, FILLET5_R), FILLET5_R, 180, 90)
            Line((0, FILLET5_R), (0, 0))
            Line((0, 0), (FILLET5_R, 0))
        make_face()
    fillet5_piece_10 = extrude(amount=10, mode=Mode.PRIVATE)
    fillet5_piece_10 = fillet5_piece_10 - Plane(origin=(56.1, -10, 27.115850543), x_dir=(-1, 0, 0), z_dir=(0, 0, 1)) * Cylinder(10, 30, mode=Mode.PRIVATE)
    add(fillet5_piece_10)
    with BuildSketch(Plane(origin=(46.1, -10, -26.5), x_dir=(1, 0, 0), z_dir=(0, -1, 0))) as fillet5_piece_11_section:
        with BuildLine():
            CenterArc((FILLET5_R, -FILLET5_R), FILLET5_R, 90, 90)
            Line((0, -FILLET5_R), (0, 0))
            Line((0, 0), (FILLET5_R, 0))
        make_face()
    fillet5_piece_11 = extrude(amount=10, mode=Mode.PRIVATE)
    fillet5_piece_11 = fillet5_piece_11 - Plane(origin=(56.1, -10, -27.115850543), x_dir=(-1, 0, 0), z_dir=(0, 0, 1)) * Cylinder(10, 30, mode=Mode.PRIVATE)
    add(fillet5_piece_11)

    # Sketch23 → Cut-Extrude5 (cut)
    with BuildSketch(Plane(origin=(0, -10, 0), x_dir=(1, 0, 0), z_dir=(0, 1, 0))):
        with Locations((44.873232105, 15)):
            Rectangle(SKETCH23_W, SKETCH23_H)
        with Locations((44.351234715, -15)):
            Rectangle(SKETCH23_W_2, SKETCH23_H)
    extrude(amount=-CUT_EXTRUDE5_DEPTH, mode=Mode.SUBTRACT)


solid = part.part
